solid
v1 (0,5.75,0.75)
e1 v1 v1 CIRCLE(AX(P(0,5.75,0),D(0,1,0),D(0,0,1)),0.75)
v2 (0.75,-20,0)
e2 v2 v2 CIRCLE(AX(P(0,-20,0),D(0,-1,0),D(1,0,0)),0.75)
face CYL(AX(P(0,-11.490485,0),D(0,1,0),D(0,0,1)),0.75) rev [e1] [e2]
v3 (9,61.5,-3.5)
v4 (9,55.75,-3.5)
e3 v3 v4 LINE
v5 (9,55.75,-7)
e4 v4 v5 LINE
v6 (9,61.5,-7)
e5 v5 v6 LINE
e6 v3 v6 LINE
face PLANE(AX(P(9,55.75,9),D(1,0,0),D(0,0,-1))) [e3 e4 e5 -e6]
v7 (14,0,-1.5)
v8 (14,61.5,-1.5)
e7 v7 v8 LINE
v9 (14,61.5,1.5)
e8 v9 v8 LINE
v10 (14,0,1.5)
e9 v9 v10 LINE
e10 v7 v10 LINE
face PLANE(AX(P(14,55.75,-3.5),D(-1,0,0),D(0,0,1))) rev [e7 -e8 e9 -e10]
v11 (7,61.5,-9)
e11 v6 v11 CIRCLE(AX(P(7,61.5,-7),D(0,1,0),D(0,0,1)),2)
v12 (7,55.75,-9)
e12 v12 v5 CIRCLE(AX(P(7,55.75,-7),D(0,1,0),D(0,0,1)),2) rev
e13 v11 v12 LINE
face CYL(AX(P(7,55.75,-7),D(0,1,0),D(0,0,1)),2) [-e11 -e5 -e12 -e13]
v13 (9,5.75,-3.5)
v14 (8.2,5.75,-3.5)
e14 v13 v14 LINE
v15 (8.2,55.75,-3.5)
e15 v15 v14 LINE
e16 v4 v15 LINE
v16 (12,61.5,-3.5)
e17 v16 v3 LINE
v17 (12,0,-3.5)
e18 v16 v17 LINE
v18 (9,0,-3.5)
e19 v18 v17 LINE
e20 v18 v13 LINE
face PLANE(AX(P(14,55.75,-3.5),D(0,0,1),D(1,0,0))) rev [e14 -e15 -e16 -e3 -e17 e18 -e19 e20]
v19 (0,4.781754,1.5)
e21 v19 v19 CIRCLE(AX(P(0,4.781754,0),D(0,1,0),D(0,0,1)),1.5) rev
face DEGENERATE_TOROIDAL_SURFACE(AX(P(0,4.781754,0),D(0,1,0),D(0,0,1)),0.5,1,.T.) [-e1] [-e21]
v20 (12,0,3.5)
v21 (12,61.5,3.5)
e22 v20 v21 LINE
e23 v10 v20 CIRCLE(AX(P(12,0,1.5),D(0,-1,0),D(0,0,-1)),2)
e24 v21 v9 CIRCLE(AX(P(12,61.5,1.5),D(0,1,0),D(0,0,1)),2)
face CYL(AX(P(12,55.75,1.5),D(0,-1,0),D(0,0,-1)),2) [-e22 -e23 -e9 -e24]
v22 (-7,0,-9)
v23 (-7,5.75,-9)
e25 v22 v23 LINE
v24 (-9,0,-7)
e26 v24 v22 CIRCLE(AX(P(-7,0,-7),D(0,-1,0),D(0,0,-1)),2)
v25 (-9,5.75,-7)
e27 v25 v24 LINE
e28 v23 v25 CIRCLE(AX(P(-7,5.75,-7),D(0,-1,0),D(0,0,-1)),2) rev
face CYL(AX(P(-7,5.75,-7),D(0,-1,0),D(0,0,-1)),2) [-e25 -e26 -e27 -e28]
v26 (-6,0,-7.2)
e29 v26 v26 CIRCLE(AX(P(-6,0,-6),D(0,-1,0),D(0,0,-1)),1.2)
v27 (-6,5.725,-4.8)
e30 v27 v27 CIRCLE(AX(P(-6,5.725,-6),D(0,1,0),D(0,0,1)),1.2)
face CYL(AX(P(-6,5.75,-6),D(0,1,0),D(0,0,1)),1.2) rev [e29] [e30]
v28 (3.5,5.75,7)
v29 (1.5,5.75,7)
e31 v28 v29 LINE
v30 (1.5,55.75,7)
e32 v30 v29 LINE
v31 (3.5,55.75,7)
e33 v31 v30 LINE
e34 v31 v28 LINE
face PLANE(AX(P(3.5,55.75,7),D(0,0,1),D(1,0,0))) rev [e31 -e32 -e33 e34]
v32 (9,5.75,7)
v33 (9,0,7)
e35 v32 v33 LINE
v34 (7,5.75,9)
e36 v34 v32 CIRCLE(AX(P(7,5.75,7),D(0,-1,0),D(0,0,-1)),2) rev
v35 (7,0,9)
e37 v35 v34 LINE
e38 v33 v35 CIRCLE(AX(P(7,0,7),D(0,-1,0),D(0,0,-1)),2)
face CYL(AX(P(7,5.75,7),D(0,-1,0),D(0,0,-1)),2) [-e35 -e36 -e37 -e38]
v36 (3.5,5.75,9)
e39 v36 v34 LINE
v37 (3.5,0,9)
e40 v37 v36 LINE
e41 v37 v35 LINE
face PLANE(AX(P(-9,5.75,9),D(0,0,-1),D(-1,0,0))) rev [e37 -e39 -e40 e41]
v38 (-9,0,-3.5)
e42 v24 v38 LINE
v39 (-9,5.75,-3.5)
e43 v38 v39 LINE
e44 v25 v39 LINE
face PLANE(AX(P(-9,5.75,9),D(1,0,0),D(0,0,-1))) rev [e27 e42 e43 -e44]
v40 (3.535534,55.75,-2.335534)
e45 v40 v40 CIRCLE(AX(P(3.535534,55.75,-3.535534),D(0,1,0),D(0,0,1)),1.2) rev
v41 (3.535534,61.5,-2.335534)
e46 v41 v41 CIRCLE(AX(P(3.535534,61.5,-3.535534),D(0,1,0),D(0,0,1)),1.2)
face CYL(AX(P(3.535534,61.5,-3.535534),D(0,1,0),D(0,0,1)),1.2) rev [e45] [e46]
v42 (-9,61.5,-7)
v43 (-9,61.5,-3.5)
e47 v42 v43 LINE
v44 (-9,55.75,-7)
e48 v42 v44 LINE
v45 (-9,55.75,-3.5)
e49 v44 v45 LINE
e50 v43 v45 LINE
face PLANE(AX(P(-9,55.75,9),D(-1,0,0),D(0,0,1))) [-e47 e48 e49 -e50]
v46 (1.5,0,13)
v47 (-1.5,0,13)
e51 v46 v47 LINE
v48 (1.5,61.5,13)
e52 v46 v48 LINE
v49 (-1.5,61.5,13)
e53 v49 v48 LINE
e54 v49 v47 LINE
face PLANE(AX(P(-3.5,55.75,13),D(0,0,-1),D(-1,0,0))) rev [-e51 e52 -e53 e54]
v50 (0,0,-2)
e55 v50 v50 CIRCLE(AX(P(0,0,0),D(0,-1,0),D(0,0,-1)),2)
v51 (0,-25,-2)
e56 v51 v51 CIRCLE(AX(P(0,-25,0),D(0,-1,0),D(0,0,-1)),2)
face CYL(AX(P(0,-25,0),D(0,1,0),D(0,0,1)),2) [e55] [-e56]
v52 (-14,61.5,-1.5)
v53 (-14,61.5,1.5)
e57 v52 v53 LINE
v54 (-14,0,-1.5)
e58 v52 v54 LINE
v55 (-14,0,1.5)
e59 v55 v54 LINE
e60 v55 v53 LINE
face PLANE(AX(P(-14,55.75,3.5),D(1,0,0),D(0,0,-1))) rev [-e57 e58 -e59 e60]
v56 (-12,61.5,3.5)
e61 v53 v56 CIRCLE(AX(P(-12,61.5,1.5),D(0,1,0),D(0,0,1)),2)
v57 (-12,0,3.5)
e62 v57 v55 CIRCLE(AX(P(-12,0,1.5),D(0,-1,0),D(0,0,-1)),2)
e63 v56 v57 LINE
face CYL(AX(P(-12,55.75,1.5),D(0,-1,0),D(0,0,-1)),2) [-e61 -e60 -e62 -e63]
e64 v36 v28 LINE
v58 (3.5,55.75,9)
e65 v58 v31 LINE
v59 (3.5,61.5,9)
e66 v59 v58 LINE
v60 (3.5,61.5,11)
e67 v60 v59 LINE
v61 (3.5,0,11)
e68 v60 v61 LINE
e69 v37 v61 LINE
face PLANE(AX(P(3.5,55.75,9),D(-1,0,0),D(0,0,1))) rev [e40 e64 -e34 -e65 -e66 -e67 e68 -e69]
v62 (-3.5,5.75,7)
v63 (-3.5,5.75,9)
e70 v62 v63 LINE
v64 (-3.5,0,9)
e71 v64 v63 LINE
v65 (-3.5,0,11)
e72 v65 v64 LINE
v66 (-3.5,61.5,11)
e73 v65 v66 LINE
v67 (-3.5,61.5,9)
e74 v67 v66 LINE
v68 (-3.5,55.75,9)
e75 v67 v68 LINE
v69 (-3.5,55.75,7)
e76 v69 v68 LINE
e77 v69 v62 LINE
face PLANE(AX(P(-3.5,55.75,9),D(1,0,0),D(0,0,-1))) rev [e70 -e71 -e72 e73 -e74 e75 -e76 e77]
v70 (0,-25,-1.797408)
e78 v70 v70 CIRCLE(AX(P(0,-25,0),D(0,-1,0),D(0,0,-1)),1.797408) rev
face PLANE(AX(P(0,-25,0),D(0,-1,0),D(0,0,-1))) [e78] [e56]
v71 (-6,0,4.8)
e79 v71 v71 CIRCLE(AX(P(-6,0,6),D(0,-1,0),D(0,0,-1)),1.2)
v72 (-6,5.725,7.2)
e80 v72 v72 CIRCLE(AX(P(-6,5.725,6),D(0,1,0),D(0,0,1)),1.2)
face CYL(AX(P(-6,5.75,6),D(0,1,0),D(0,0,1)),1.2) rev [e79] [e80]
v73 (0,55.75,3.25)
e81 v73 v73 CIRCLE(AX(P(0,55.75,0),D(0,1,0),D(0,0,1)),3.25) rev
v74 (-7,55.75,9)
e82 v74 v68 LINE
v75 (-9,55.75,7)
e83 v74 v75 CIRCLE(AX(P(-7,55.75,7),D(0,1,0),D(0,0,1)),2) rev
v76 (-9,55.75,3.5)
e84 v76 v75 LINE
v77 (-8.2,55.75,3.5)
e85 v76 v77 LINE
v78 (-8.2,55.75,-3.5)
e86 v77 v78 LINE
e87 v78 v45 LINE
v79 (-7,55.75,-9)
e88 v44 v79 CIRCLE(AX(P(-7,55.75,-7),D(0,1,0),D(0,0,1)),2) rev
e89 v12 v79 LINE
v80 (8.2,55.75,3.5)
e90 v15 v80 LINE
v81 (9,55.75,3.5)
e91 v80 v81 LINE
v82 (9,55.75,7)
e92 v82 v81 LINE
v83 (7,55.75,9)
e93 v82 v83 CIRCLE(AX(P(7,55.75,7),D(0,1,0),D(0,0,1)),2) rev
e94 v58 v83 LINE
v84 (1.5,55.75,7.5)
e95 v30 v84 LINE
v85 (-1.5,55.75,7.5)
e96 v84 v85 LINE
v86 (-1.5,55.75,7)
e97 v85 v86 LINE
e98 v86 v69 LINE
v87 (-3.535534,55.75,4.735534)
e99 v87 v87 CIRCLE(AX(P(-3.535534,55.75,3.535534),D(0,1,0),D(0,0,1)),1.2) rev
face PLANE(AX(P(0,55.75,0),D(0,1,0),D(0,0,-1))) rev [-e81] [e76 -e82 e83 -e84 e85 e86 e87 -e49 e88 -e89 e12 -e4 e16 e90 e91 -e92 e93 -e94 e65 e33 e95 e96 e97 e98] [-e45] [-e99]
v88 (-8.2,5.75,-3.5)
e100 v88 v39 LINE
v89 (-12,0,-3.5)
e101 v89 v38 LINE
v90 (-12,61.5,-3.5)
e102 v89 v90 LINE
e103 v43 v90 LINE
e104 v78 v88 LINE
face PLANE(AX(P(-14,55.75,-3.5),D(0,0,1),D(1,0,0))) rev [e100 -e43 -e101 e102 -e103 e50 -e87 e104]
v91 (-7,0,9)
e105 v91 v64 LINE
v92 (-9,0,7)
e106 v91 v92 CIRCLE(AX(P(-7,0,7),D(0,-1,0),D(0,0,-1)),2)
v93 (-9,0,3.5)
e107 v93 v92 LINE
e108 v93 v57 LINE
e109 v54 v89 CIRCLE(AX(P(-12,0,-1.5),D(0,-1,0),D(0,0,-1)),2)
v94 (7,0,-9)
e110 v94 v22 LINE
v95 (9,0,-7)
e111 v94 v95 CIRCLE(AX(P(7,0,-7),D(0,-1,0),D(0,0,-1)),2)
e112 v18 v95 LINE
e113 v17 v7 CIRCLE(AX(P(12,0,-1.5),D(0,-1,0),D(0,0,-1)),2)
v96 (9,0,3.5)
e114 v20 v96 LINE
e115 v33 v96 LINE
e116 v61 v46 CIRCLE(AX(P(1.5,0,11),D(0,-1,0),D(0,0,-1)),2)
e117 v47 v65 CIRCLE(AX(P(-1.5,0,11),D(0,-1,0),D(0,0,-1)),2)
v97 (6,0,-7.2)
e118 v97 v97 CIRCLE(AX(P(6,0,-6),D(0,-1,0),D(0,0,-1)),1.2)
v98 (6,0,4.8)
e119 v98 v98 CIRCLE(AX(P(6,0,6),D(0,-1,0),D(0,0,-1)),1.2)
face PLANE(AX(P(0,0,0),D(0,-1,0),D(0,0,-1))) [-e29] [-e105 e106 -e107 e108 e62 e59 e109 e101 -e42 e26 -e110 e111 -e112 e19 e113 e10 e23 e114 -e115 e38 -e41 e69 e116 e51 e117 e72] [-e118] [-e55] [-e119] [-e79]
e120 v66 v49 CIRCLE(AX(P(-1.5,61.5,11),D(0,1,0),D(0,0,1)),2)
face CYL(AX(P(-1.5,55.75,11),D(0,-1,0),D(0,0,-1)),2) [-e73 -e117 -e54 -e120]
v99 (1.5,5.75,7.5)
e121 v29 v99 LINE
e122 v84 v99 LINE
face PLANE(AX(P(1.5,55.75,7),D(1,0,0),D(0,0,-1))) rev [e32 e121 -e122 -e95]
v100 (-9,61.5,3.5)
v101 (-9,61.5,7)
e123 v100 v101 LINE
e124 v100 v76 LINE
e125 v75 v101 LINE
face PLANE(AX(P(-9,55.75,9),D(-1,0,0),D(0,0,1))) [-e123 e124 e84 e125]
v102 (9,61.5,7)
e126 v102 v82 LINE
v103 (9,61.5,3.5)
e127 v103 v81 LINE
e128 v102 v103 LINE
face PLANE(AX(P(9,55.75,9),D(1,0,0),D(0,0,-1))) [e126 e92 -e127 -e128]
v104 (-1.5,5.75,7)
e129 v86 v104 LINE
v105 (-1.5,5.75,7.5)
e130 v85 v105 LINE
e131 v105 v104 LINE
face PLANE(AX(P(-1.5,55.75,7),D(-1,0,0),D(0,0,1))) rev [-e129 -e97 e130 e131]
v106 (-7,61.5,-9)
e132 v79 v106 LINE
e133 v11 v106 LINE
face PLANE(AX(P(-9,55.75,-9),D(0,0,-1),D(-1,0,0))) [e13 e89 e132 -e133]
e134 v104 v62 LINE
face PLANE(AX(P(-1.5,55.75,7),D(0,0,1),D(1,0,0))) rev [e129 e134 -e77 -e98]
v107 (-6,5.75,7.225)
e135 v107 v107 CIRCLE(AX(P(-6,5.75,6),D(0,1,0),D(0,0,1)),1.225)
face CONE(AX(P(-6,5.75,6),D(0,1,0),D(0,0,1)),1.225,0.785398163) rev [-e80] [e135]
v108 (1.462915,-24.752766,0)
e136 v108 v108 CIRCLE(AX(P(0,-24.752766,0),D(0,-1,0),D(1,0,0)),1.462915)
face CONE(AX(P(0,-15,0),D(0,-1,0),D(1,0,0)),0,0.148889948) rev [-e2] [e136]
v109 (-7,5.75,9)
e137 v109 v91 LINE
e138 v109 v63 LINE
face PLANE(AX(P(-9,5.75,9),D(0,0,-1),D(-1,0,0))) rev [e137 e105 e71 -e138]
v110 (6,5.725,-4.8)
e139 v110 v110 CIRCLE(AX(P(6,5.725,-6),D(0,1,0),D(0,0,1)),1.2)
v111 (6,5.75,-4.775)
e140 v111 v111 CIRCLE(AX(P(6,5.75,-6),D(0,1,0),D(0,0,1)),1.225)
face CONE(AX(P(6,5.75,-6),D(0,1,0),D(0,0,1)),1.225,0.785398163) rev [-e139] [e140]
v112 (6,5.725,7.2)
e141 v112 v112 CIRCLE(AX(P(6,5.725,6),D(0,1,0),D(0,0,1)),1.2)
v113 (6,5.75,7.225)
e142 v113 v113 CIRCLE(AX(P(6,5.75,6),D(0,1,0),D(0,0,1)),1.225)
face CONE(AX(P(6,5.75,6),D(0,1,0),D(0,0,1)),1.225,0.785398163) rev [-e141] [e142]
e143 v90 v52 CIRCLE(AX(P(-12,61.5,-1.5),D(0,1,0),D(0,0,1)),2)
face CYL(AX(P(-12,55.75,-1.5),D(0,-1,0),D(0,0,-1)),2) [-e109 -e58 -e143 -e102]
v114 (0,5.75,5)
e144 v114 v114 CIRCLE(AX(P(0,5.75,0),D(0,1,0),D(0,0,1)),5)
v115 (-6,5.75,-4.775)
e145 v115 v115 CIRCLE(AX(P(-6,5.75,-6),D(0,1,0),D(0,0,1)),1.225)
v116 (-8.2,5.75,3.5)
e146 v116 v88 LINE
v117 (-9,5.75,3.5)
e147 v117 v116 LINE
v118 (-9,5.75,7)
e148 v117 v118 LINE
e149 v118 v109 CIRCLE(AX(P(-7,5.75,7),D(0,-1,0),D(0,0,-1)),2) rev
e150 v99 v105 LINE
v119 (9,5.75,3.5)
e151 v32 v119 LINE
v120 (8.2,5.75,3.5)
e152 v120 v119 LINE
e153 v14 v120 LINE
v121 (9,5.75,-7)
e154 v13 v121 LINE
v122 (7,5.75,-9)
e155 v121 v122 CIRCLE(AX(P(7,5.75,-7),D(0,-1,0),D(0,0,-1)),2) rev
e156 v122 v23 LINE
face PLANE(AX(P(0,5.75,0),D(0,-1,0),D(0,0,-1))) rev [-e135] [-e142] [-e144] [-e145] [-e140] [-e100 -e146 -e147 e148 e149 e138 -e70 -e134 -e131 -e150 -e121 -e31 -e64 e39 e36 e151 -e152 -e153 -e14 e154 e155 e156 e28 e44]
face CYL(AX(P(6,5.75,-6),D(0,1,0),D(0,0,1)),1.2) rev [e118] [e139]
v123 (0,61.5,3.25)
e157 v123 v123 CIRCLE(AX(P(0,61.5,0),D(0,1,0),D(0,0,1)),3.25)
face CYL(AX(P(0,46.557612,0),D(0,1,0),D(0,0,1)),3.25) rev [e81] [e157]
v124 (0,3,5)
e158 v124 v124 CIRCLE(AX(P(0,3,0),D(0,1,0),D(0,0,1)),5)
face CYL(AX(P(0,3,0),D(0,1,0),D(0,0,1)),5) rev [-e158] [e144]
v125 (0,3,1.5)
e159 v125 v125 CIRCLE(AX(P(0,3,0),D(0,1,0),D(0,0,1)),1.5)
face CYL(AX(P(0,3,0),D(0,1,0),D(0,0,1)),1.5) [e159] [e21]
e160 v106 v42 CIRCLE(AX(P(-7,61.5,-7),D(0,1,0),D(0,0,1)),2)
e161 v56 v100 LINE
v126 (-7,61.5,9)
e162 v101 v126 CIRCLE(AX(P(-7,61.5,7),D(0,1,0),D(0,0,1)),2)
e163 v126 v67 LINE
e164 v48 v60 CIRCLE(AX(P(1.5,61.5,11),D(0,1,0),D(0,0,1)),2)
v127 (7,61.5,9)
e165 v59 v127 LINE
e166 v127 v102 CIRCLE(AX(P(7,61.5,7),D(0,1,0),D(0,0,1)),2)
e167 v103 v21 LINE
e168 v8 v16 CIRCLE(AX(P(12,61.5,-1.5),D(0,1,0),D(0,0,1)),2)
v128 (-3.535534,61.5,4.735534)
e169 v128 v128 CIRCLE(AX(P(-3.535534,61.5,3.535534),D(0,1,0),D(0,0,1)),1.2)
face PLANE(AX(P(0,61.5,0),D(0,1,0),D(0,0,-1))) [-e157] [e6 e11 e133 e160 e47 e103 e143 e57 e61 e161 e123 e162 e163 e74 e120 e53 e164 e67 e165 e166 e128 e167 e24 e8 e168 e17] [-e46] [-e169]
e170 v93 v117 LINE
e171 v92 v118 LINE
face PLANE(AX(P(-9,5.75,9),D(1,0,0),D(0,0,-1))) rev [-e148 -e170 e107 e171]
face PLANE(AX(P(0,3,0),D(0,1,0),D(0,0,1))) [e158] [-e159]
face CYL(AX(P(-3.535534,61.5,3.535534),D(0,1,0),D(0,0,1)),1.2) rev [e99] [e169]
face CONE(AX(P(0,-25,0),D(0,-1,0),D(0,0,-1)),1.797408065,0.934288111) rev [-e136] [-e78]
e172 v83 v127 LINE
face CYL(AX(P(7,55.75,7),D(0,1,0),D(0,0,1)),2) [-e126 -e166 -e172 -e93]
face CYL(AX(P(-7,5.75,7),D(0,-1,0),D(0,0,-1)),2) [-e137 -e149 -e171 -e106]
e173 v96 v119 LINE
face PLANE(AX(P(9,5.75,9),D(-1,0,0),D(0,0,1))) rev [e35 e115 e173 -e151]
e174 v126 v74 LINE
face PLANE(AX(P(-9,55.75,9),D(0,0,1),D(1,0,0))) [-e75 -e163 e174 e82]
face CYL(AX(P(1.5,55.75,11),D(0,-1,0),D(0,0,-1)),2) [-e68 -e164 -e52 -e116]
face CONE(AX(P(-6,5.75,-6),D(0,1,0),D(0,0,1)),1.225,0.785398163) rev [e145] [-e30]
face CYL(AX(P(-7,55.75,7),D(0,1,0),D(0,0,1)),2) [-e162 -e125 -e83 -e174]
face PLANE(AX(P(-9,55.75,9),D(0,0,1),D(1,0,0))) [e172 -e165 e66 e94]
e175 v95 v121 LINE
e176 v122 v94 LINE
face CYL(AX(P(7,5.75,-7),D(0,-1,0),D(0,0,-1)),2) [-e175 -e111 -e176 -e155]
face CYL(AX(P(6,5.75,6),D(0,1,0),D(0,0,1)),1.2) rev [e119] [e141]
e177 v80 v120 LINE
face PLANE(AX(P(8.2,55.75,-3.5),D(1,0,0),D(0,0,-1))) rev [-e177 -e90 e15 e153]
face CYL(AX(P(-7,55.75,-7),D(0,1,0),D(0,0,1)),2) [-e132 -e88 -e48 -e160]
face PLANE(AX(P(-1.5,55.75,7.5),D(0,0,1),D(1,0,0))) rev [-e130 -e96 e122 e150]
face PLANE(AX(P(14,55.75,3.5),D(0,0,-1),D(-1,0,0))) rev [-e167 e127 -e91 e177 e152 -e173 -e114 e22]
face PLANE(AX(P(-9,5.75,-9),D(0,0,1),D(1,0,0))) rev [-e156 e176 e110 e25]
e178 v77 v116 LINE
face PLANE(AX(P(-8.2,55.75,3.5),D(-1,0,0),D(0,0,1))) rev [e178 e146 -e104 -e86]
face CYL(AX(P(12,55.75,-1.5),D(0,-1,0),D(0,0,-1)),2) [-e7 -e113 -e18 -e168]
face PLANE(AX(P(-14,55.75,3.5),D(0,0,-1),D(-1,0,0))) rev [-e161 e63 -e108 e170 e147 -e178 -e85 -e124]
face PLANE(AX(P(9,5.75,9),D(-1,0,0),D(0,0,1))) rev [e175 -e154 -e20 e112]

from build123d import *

# Parameters (mm, degrees)
SKETCH1_W                      = 18
SKETCH1_H                      = 18
BOSS_EXTRUDE1_DEPTH            = 5.75
M2_CLEARANCE_HOLE1_D           = 2.4
M2_CLEARANCE_HOLE1_CSINK_D     = 2.45
M2_CLEARANCE_HOLE1_CSINK_ANGLE = 90
SKETCH5_W                      = 5.8
SKETCH5_H                      = 7
BOSS_EXTRUDE2_DEPTH            = 50
SKETCH6_R                      = 4.0625
CUT_EXTRUDE1_DEPTH             = 5.75
SKETCH7_R                      = 3.25
CUT_EXTRUDE2_DEPTH             = 5.75
FILLET1_R                      = 2
M2_CLEARANCE_HOLE2_D           = 2.4
M2_CLEARANCE_HOLE2_DEPTH       = 5.75
M2_CLEARANCE_HOLE2_TIP         = 0.721032743
SKETCH11_W                     = 5
SKETCH11_H                     = 7
SKETCH11_W_2                   = 7
SKETCH11_H_2                   = 4
BOSS_EXTRUDE3_DEPTH            = 5.75
SKETCH12_W                     = 5
SKETCH12_H                     = 7
SKETCH12_W_2                   = 7
SKETCH12_H_2                   = 4
BOSS_EXTRUDE4_DEPTH            = 5.75
FILLET2_R                      = 2
SKETCH15_R                     = 4.0625
SKETCH15_R_2                   = 0.75
BOSS_EXTRUDE5_DEPTH            = 5.75
SKETCH16_R                     = 2
SKETCH16_R_2                   = 0.75
BOSS_EXTRUDE6_DEPTH            = 25
SKETCH17_R                     = 5
SKETCH17_R_2                   = 1.5
CUT_EXTRUDE3_DEPTH             = 2.75
CHAMFER1_SIZE                  = 0.25
CHAMFER1_SIZE2                 = 0.297408065
FILLET3_R                      = 1


with BuildPart() as part:
    # Sketch1 → Boss-Extrude1 (new body)
    with BuildSketch(Plane(origin=(0, 0, 0), x_dir=(1, 0, 0), z_dir=(0, 1, 0))):
        Rectangle(SKETCH1_W, SKETCH1_H)
    boss_extrude1 = extrude(amount=BOSS_EXTRUDE1_DEPTH)

    # M2 Clearance Hole1 (through all)
    with Locations(Plane(origin=(0, 5.75, 0), x_dir=(1, 0, 0), z_dir=(0, 1, 0))):
        with Locations((-6, 6), (6, 6), (-6, -6), (6, -6)):
            CounterSinkHole(M2_CLEARANCE_HOLE1_D / 2, M2_CLEARANCE_HOLE1_CSINK_D / 2, counter_sink_angle=M2_CLEARANCE_HOLE1_CSINK_ANGLE)

    # Sketch5 → Boss-Extrude2 (add)
    with BuildSketch(Plane(origin=(0, 5.75, 0), x_dir=(1, 0, 0), z_dir=(0, 1, 0))):
        with Locations((-11.1, 0)):
            Rectangle(SKETCH5_W, SKETCH5_H)
        with Locations((11.1, 0)):
            Rectangle(SKETCH5_W, SKETCH5_H)
        Polygon((3.5, -7), (1.5, -7), (1.5, -7.5), (-1.5, -7.5), (-1.5, -7), (-3.5, -7), (-3.5, -9), (-3.5, -13), (3.5, -13), (3.5, -9), align=None)
    extrude(amount=BOSS_EXTRUDE2_DEPTH)

    # Sketch6 → Cut-Extrude1 (cut)
    with BuildSketch(Plane(origin=(0, 5.75, 0), x_dir=(1, 0, 0), z_dir=(0, 1, 0))):
        with Locations(Location((0, 0, 0), (0, 0, 270))):
            Circle(SKETCH6_R)
    extrude(amount=-CUT_EXTRUDE1_DEPTH, mode=Mode.SUBTRACT)

    # Mirror1: Boss-Extrude1 across plane
    add(boss_extrude1.mirror(Plane.ZX.offset(30.75)))

    # Sketch7 → Cut-Extrude2 (cut)
    with BuildSketch(Plane(origin=(0, 61.5, 0), x_dir=(1, 0, 0), z_dir=(0, 1, 0))):
        with Locations(Location((0, 0, 0), (0, 0, 270))):
            Circle(SKETCH7_R)
    extrude(amount=-CUT_EXTRUDE2_DEPTH, mode=Mode.SUBTRACT)

    # Fillet1
    fillet1_edges = [part.edges().sort_by_distance(p)[0] for p in [
        (9, 58.625, -9),
        (9, 58.625, 9),
        (-9, 58.625, 9),
        (-9, 58.625, -9),
        (9, 2.875, 9),
        (-9, 2.875, 9),
        (-9, 2.875, -9),
        (9, 2.875, -9),
    ]]
    fillet(fillet1_edges, radius=FILLET1_R)

    # M2 Clearance Hole2
    with Locations(Plane(origin=(0, 61.5, 0), x_dir=(1, 0, 0), z_dir=(0, 1, 0))):
        with Locations((-3.535533906, -3.535533906), (3.535533906, 3.535533906)):
            Hole(M2_CLEARANCE_HOLE2_D / 2, depth=M2_CLEARANCE_HOLE2_DEPTH)
            with Locations((0, 0, -(M2_CLEARANCE_HOLE2_DEPTH + M2_CLEARANCE_HOLE2_TIP / 2))):  # 118° drill point
                Cone(0, M2_CLEARANCE_HOLE2_D / 2, M2_CLEARANCE_HOLE2_TIP, mode=Mode.SUBTRACT)

    # Sketch11 → Boss-Extrude3 (add)
    with BuildSketch(Plane(origin=(0, 55.75, 0), x_dir=(1, 0, 0), z_dir=(0, 1, 0))):
        with Locations((-11.5, 0)):
            Rectangle(SKETCH11_W, SKETCH11_H)
        with Locations((11.5, 0)):
            Rectangle(SKETCH11_W, SKETCH11_H)
        with Locations((0, -11)):
            Rectangle(SKETCH11_W_2, SKETCH11_H_2)
    extrude(amount=BOSS_EXTRUDE3_DEPTH)

    # Sketch12 → Boss-Extrude4 (add)
    with BuildSketch(Plane.XZ.offset(-5.75)):
        with Locations((-11.5, 0)):
            Rectangle(SKETCH12_W, SKETCH12_H)
        with Locations((0, 11)):
            Rectangle(SKETCH12_W_2, SKETCH12_H_2)
        with Locations((11.5, 0)):
            Rectangle(SKETCH12_W, SKETCH12_H)
    extrude(amount=BOSS_EXTRUDE4_DEPTH)

    # Fillet2
    fillet2_edges = [part.edges().sort_by_distance(p)[0] for p in [
        (-14, 30.75, -3.5),
        (-14, 30.75, 3.5),
        (-3.5, 30.75, 13),
        (3.5, 30.75, 13),
        (14, 30.75, -3.5),
        (14, 30.75, 3.5),
    ]]
    fillet(fillet2_edges, radius=FILLET2_R)

    # Sketch15 → Boss-Extrude5 (add)
    with BuildSketch(Plane(origin=(0, 5.75, 0), x_dir=(1, 0, 0), z_dir=(0, 1, 0))):
        Circle(SKETCH15_R)
        with Locations(Location((0, 0, 0), (0, 0, 270))):
            Circle(SKETCH15_R_2, mode=Mode.SUBTRACT)
    extrude(amount=-BOSS_EXTRUDE5_DEPTH)

    # Sketch16 → Boss-Extrude6 (add)
    with BuildSketch(Plane.XZ):
        with Locations(Location((0, 0, 0), (0, 0, 270))):
            Circle(SKETCH16_R)
        with Locations(Location((0, 0, 0), (0, 0, 90))):
            Circle(SKETCH16_R_2, mode=Mode.SUBTRACT)
    extrude(amount=BOSS_EXTRUDE6_DEPTH)

    # Sketch17 → Cut-Extrude3 (cut)
    with BuildSketch(Plane(origin=(0, 5.75, 0), x_dir=(1, 0, 0), z_dir=(0, 1, 0))):
        with Locations(Location((0, 0, 0), (0, 0, 270))):
            Circle(SKETCH17_R)
        with Locations(Location((0, 0, 0), (0, 0, 270))):
            Circle(SKETCH17_R_2, mode=Mode.SUBTRACT)
    extrude(amount=-CUT_EXTRUDE3_DEPTH, mode=Mode.SUBTRACT)

    # Sketch19 → Cut-Revolve1 (revolve, cut)
    with BuildSketch(Plane.XY, mode=Mode.PRIVATE) as cut_revolve1_sk:
        Polygon((0, -25), (-1.5, -25), (0, -15), align=None)
    revolve(cut_revolve1_sk.sketch.rotate(Axis((0, -15, 0), (0, -1, 0)), 270), axis=Axis((0, -15, 0), (0, -1, 0)), mode=Mode.SUBTRACT)

    # Chamfer1
    chamfer1_edges = [part.edges().sort_by_distance(p)[0] for p in [
        (0, -25, -1.5),
    ]]
    chamfer1_side = [part.faces().sort_by_distance(p)[0] for p in [
        (0, -22.5, -1.125),
    ]]
    chamfer(chamfer1_edges, length=CHAMFER1_SIZE, length2=CHAMFER1_SIZE2, reference=chamfer1_side[0])

    # Fillet3
    # the kernel refuses this fillet: 1 mm, written as the material it takes off along each edge
    with BuildSketch(Plane(origin=(0, 5.75, 0), x_dir=(0, 0, 1), z_dir=(-1, 0, 0))) as fillet3_piece_1:
        with BuildLine():
            CenterArc((0.5, -0.968245837), FILLET3_R, 0, 75.522487814)
            Line((1.5, -0.968245837), (1.52, -0.968245837))
            Line((1.52, -0.968245837), (1.52, 0))
            Line((1.52, 0), (1.5, 0.02))
            ThreePointArc((1.5, 0.02), (1.125, 0.02), (0.755, 0.019364917))
            Line((0.755, 0.019364917), (0.75, 0))
        make_face()
    revolve(axis=Axis((0, 5.75, 0), (0, 1, 0)), mode=Mode.SUBTRACT)


solid = part.part
